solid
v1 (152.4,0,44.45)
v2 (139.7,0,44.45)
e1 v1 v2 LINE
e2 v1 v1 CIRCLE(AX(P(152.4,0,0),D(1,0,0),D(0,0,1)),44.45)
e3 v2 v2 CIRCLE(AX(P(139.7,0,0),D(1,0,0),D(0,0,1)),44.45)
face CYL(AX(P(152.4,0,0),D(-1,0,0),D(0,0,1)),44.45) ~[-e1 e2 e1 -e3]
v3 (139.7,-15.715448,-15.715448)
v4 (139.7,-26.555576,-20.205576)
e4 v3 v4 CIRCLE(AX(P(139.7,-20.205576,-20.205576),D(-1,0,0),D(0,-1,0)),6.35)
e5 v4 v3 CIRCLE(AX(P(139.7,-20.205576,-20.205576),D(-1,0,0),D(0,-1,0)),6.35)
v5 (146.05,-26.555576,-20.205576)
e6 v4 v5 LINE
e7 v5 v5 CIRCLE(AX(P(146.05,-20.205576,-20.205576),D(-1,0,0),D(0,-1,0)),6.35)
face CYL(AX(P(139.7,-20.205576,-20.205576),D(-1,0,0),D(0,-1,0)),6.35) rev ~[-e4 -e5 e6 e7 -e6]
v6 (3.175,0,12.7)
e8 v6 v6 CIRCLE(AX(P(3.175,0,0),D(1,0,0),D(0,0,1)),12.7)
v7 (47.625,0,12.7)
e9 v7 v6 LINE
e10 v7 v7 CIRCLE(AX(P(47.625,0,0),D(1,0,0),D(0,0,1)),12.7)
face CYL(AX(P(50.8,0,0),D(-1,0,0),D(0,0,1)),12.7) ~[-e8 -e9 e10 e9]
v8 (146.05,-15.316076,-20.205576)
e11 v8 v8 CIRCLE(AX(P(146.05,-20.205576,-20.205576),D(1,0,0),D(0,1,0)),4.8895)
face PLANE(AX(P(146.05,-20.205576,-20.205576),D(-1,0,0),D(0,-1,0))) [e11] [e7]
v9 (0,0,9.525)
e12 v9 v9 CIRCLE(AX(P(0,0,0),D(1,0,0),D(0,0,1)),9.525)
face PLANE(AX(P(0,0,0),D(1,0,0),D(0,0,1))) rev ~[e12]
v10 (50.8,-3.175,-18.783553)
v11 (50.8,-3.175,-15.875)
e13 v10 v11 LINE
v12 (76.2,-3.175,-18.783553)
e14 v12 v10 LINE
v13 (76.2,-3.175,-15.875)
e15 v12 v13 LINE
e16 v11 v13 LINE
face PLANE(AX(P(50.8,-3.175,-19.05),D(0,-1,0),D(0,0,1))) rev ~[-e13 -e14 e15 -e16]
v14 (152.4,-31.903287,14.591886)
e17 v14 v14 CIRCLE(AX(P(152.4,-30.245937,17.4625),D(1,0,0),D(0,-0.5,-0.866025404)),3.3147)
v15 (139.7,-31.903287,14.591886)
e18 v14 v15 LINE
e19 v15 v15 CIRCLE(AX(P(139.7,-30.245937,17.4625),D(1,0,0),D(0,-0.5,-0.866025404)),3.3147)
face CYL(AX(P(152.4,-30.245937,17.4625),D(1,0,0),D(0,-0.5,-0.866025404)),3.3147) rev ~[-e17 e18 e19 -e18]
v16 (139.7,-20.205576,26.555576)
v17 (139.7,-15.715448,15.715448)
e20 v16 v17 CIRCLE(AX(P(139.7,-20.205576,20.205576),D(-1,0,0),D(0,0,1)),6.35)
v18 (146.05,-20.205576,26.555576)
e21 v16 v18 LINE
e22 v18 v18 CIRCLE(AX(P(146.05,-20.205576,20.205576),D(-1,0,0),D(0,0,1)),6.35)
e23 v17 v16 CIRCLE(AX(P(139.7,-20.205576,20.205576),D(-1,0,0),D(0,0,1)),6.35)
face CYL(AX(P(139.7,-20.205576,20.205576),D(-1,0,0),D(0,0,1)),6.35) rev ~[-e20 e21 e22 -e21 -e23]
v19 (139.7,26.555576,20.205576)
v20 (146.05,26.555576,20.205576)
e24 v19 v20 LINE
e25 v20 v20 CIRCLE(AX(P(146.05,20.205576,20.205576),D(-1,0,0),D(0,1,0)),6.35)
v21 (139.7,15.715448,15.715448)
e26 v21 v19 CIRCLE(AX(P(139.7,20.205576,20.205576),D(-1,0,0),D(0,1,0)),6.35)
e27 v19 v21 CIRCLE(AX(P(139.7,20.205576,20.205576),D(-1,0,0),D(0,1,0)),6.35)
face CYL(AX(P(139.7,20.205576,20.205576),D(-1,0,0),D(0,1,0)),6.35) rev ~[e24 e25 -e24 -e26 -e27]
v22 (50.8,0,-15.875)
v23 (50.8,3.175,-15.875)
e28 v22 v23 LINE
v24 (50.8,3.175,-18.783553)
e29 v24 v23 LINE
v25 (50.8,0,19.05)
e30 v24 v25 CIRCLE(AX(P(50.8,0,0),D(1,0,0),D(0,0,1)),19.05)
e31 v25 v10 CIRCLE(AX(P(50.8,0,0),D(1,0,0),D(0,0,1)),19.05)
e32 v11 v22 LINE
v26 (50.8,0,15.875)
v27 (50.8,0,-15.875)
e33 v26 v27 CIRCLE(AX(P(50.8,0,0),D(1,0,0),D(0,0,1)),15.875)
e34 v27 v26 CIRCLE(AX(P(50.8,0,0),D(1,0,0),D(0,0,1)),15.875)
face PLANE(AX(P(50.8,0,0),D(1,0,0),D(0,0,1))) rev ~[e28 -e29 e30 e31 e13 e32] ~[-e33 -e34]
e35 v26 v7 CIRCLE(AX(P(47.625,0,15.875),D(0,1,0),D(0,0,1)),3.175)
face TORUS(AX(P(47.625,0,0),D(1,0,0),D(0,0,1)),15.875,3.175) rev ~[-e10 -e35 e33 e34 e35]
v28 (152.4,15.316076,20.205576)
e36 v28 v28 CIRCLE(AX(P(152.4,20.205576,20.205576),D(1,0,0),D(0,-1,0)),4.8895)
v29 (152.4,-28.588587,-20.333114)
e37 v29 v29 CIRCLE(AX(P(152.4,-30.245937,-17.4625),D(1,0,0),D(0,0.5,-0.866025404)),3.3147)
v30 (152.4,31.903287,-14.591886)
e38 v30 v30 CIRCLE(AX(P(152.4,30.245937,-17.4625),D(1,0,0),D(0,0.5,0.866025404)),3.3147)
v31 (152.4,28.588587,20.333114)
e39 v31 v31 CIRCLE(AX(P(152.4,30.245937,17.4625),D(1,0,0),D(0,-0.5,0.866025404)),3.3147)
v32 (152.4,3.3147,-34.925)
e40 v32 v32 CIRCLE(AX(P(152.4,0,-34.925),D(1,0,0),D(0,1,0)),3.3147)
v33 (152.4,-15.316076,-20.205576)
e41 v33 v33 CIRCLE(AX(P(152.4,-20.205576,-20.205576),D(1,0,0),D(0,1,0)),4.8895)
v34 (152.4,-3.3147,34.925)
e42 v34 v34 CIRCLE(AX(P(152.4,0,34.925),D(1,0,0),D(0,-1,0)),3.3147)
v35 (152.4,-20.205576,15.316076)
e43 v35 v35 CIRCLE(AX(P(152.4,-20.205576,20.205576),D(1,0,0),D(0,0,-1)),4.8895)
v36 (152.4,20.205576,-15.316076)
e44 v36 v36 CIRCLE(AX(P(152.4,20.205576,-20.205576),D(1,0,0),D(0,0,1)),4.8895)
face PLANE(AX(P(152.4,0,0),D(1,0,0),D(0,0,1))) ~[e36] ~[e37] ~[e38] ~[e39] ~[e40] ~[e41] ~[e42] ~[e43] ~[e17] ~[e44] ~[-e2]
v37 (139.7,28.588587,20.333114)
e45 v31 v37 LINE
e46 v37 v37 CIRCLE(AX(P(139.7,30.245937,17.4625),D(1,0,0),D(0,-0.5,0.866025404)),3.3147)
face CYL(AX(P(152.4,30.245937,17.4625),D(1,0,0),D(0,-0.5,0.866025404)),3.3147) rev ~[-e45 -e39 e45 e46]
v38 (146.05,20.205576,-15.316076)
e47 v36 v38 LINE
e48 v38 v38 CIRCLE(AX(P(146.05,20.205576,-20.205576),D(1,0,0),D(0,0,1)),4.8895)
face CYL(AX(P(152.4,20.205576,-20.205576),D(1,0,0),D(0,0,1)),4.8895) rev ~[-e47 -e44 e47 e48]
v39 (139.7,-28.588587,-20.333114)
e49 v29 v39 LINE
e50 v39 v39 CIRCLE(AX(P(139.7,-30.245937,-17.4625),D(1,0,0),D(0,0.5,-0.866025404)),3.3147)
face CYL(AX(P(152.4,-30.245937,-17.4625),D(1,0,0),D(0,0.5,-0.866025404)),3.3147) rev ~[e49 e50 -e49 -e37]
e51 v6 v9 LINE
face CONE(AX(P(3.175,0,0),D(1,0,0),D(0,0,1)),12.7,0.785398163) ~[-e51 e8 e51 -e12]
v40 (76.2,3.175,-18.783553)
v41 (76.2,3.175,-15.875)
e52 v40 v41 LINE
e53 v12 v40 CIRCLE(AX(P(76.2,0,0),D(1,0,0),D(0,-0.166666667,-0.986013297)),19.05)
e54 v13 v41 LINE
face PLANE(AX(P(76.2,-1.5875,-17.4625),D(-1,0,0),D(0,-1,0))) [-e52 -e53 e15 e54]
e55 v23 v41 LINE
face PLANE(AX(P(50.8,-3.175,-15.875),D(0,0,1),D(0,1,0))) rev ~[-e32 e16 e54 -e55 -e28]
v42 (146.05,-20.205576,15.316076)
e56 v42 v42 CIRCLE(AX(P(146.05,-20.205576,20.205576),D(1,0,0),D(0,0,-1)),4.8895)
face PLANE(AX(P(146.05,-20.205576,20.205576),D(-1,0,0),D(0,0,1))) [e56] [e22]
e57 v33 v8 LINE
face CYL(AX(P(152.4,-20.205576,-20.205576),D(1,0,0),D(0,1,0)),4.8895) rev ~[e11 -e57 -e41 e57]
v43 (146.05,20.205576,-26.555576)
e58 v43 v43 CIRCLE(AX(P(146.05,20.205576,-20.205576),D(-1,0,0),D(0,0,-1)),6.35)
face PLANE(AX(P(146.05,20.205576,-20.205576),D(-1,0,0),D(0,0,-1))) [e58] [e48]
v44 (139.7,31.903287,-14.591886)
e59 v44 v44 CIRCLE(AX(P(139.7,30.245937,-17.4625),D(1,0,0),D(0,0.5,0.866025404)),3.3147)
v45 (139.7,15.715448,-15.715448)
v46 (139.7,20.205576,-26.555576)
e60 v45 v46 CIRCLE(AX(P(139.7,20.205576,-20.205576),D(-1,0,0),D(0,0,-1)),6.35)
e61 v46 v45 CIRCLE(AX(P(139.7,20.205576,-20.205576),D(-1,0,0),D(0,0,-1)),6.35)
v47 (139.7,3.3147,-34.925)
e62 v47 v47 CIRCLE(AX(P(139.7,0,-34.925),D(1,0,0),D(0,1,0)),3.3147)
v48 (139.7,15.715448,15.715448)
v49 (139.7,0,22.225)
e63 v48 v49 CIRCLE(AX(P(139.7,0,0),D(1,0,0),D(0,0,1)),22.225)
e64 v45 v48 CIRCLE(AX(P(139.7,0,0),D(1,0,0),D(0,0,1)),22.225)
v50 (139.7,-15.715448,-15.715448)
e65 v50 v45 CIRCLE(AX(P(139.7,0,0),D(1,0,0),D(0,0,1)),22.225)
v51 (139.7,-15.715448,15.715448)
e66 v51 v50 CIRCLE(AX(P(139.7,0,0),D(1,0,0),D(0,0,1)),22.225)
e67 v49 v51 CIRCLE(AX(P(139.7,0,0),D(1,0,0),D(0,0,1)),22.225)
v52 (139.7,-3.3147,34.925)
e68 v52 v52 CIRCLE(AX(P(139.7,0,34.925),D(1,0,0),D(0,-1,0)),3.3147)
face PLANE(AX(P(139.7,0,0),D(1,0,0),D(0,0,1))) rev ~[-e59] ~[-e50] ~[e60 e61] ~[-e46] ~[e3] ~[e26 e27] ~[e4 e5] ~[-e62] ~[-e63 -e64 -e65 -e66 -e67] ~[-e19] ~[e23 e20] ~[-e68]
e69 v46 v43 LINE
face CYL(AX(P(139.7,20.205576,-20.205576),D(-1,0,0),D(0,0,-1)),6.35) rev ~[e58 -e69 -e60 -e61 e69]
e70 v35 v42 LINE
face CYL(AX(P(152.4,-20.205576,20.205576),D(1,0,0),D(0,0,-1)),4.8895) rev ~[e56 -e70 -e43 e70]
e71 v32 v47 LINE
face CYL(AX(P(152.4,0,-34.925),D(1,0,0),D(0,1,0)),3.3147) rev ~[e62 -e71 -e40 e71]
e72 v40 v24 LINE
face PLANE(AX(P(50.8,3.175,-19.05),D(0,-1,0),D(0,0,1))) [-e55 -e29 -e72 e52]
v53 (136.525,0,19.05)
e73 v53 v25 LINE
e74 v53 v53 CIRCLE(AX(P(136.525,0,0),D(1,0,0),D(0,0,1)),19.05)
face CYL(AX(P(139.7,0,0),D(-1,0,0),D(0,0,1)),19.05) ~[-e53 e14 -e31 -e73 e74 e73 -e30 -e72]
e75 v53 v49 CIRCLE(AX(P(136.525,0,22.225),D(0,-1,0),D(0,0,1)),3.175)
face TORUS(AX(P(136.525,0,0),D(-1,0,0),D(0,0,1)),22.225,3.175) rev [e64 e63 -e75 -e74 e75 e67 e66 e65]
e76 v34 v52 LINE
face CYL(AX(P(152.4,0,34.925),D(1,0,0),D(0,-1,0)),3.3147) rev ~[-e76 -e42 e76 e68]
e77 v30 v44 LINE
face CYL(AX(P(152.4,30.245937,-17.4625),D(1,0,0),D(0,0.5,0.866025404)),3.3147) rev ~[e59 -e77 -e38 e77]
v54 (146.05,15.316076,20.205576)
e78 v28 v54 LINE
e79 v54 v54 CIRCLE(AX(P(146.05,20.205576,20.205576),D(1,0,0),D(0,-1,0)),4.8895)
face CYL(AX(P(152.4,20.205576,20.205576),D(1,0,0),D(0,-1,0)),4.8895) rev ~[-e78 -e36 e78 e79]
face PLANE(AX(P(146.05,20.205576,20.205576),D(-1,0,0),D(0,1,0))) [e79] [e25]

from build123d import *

# Parameters (mm, degrees)
F2_R             = 3.175
F3_R             = 3.175
F4_SIZE          = 3.175
F5_R             = 3.3147
F6_DEPTH         = 152.401
F6_COPIES_COUNT  = 6
F7_W             = 3.175
F7_H             = 3.175
F8_DEPTH         = 25.4
F9_R             = 4.8895
F10_DEPTH        = 152.401
F10_COPIES_COUNT = 4
F11_R            = 6.35
F12_DEPTH        = 6.35
F12_COPIES_COUNT = 4


# Not quite as in the source:
# - a pattern or mirror of a feature is missing from the dataset's text; its kind, count and spacing are read off the source's solid


with BuildPart() as f1:
    # F0 (on Front) → F1 (revolve)
    with BuildSketch(Plane.XZ):
        Polygon((0, 12.7), (0, 0), (152.4, 0), (152.4, 44.45), (139.7, 44.45), (139.7, 19.05), (50.8, 19.05), (50.8, 12.7), align=None)
    revolve(axis=Axis((76.2, 0, 0), (1, 0, 0)))

    # F2
    f2_edges = [f1.edges().sort_by_distance(p)[0] for p in [
        (50.8, 0, -12.7),
    ]]
    fillet(f2_edges, radius=F2_R)

    # F3
    f3_edges = [f1.edges().sort_by_distance(p)[0] for p in [
        (139.7, 0, -19.05),
    ]]
    fillet(f3_edges, radius=F3_R)

    # F4
    f4_edges = [f1.edges().sort_by_distance(p)[0] for p in [
        (0, 0, -12.7),
    ]]
    chamfer(f4_edges, length=F4_SIZE)

    # F5 (on face) → F6 (cut, through all)
    with BuildSketch(Plane.YZ.offset(152.4)):
        with Locations((0, -34.925)):
            Circle(F5_R)
    f6 = extrude(amount=-F6_DEPTH, mode=Mode.SUBTRACT)

    # F6_copies: F6 ×6 about axis
    f6_copies_axis = Axis((0, 0, 0), (1, 0, 0))
    for i in range(1, F6_COPIES_COUNT):
        add(f6.rotate(f6_copies_axis, i * 360 / F6_COPIES_COUNT), mode=Mode.SUBTRACT)

    # F7 (on face) → F8 (cut)
    with BuildSketch(Plane(origin=(50.8, 0, 0), x_dir=(0, -1, 0), z_dir=(-1, 0, 0))):
        with Locations((1.5875, -17.4625)):
            Rectangle(F7_W, F7_H)
        with Locations((-1.5875, -17.4625)):
            Rectangle(F7_W, F7_H)
    extrude(amount=-F8_DEPTH, mode=Mode.SUBTRACT)

    # F9 (on face) → F10 (cut, through all)
    with BuildSketch(Plane.YZ.offset(152.4)):
        with Locations((-20.2055762724, -20.2055762724)):
            Circle(F9_R)
    f10 = extrude(amount=-F10_DEPTH, mode=Mode.SUBTRACT)

    # F10_copies: F10 ×4 about axis
    f10_copies_axis = Axis((0, 0, 0), (1, 0, 0))
    for i in range(1, F10_COPIES_COUNT):
        add(f10.rotate(f10_copies_axis, i * 360 / F10_COPIES_COUNT), mode=Mode.SUBTRACT)

    # F11 (on face) → F12 (cut)
    with BuildSketch(Plane(origin=(139.7, 0, 0), x_dir=(0, -1, 0), z_dir=(-1, 0, 0))):
        with Locations((20.2055762724, -20.2055762724)):
            Circle(F11_R)
    f12 = extrude(amount=-F12_DEPTH, mode=Mode.SUBTRACT)

    # F12_copies: F12 ×4 about axis
    f12_copies_axis = Axis((0, 0, 0), (1, 0, 0))
    for i in range(1, F12_COPIES_COUNT):
        add(f12.rotate(f12_copies_axis, i * 360 / F12_COPIES_COUNT), mode=Mode.SUBTRACT)


solid = f1.part
